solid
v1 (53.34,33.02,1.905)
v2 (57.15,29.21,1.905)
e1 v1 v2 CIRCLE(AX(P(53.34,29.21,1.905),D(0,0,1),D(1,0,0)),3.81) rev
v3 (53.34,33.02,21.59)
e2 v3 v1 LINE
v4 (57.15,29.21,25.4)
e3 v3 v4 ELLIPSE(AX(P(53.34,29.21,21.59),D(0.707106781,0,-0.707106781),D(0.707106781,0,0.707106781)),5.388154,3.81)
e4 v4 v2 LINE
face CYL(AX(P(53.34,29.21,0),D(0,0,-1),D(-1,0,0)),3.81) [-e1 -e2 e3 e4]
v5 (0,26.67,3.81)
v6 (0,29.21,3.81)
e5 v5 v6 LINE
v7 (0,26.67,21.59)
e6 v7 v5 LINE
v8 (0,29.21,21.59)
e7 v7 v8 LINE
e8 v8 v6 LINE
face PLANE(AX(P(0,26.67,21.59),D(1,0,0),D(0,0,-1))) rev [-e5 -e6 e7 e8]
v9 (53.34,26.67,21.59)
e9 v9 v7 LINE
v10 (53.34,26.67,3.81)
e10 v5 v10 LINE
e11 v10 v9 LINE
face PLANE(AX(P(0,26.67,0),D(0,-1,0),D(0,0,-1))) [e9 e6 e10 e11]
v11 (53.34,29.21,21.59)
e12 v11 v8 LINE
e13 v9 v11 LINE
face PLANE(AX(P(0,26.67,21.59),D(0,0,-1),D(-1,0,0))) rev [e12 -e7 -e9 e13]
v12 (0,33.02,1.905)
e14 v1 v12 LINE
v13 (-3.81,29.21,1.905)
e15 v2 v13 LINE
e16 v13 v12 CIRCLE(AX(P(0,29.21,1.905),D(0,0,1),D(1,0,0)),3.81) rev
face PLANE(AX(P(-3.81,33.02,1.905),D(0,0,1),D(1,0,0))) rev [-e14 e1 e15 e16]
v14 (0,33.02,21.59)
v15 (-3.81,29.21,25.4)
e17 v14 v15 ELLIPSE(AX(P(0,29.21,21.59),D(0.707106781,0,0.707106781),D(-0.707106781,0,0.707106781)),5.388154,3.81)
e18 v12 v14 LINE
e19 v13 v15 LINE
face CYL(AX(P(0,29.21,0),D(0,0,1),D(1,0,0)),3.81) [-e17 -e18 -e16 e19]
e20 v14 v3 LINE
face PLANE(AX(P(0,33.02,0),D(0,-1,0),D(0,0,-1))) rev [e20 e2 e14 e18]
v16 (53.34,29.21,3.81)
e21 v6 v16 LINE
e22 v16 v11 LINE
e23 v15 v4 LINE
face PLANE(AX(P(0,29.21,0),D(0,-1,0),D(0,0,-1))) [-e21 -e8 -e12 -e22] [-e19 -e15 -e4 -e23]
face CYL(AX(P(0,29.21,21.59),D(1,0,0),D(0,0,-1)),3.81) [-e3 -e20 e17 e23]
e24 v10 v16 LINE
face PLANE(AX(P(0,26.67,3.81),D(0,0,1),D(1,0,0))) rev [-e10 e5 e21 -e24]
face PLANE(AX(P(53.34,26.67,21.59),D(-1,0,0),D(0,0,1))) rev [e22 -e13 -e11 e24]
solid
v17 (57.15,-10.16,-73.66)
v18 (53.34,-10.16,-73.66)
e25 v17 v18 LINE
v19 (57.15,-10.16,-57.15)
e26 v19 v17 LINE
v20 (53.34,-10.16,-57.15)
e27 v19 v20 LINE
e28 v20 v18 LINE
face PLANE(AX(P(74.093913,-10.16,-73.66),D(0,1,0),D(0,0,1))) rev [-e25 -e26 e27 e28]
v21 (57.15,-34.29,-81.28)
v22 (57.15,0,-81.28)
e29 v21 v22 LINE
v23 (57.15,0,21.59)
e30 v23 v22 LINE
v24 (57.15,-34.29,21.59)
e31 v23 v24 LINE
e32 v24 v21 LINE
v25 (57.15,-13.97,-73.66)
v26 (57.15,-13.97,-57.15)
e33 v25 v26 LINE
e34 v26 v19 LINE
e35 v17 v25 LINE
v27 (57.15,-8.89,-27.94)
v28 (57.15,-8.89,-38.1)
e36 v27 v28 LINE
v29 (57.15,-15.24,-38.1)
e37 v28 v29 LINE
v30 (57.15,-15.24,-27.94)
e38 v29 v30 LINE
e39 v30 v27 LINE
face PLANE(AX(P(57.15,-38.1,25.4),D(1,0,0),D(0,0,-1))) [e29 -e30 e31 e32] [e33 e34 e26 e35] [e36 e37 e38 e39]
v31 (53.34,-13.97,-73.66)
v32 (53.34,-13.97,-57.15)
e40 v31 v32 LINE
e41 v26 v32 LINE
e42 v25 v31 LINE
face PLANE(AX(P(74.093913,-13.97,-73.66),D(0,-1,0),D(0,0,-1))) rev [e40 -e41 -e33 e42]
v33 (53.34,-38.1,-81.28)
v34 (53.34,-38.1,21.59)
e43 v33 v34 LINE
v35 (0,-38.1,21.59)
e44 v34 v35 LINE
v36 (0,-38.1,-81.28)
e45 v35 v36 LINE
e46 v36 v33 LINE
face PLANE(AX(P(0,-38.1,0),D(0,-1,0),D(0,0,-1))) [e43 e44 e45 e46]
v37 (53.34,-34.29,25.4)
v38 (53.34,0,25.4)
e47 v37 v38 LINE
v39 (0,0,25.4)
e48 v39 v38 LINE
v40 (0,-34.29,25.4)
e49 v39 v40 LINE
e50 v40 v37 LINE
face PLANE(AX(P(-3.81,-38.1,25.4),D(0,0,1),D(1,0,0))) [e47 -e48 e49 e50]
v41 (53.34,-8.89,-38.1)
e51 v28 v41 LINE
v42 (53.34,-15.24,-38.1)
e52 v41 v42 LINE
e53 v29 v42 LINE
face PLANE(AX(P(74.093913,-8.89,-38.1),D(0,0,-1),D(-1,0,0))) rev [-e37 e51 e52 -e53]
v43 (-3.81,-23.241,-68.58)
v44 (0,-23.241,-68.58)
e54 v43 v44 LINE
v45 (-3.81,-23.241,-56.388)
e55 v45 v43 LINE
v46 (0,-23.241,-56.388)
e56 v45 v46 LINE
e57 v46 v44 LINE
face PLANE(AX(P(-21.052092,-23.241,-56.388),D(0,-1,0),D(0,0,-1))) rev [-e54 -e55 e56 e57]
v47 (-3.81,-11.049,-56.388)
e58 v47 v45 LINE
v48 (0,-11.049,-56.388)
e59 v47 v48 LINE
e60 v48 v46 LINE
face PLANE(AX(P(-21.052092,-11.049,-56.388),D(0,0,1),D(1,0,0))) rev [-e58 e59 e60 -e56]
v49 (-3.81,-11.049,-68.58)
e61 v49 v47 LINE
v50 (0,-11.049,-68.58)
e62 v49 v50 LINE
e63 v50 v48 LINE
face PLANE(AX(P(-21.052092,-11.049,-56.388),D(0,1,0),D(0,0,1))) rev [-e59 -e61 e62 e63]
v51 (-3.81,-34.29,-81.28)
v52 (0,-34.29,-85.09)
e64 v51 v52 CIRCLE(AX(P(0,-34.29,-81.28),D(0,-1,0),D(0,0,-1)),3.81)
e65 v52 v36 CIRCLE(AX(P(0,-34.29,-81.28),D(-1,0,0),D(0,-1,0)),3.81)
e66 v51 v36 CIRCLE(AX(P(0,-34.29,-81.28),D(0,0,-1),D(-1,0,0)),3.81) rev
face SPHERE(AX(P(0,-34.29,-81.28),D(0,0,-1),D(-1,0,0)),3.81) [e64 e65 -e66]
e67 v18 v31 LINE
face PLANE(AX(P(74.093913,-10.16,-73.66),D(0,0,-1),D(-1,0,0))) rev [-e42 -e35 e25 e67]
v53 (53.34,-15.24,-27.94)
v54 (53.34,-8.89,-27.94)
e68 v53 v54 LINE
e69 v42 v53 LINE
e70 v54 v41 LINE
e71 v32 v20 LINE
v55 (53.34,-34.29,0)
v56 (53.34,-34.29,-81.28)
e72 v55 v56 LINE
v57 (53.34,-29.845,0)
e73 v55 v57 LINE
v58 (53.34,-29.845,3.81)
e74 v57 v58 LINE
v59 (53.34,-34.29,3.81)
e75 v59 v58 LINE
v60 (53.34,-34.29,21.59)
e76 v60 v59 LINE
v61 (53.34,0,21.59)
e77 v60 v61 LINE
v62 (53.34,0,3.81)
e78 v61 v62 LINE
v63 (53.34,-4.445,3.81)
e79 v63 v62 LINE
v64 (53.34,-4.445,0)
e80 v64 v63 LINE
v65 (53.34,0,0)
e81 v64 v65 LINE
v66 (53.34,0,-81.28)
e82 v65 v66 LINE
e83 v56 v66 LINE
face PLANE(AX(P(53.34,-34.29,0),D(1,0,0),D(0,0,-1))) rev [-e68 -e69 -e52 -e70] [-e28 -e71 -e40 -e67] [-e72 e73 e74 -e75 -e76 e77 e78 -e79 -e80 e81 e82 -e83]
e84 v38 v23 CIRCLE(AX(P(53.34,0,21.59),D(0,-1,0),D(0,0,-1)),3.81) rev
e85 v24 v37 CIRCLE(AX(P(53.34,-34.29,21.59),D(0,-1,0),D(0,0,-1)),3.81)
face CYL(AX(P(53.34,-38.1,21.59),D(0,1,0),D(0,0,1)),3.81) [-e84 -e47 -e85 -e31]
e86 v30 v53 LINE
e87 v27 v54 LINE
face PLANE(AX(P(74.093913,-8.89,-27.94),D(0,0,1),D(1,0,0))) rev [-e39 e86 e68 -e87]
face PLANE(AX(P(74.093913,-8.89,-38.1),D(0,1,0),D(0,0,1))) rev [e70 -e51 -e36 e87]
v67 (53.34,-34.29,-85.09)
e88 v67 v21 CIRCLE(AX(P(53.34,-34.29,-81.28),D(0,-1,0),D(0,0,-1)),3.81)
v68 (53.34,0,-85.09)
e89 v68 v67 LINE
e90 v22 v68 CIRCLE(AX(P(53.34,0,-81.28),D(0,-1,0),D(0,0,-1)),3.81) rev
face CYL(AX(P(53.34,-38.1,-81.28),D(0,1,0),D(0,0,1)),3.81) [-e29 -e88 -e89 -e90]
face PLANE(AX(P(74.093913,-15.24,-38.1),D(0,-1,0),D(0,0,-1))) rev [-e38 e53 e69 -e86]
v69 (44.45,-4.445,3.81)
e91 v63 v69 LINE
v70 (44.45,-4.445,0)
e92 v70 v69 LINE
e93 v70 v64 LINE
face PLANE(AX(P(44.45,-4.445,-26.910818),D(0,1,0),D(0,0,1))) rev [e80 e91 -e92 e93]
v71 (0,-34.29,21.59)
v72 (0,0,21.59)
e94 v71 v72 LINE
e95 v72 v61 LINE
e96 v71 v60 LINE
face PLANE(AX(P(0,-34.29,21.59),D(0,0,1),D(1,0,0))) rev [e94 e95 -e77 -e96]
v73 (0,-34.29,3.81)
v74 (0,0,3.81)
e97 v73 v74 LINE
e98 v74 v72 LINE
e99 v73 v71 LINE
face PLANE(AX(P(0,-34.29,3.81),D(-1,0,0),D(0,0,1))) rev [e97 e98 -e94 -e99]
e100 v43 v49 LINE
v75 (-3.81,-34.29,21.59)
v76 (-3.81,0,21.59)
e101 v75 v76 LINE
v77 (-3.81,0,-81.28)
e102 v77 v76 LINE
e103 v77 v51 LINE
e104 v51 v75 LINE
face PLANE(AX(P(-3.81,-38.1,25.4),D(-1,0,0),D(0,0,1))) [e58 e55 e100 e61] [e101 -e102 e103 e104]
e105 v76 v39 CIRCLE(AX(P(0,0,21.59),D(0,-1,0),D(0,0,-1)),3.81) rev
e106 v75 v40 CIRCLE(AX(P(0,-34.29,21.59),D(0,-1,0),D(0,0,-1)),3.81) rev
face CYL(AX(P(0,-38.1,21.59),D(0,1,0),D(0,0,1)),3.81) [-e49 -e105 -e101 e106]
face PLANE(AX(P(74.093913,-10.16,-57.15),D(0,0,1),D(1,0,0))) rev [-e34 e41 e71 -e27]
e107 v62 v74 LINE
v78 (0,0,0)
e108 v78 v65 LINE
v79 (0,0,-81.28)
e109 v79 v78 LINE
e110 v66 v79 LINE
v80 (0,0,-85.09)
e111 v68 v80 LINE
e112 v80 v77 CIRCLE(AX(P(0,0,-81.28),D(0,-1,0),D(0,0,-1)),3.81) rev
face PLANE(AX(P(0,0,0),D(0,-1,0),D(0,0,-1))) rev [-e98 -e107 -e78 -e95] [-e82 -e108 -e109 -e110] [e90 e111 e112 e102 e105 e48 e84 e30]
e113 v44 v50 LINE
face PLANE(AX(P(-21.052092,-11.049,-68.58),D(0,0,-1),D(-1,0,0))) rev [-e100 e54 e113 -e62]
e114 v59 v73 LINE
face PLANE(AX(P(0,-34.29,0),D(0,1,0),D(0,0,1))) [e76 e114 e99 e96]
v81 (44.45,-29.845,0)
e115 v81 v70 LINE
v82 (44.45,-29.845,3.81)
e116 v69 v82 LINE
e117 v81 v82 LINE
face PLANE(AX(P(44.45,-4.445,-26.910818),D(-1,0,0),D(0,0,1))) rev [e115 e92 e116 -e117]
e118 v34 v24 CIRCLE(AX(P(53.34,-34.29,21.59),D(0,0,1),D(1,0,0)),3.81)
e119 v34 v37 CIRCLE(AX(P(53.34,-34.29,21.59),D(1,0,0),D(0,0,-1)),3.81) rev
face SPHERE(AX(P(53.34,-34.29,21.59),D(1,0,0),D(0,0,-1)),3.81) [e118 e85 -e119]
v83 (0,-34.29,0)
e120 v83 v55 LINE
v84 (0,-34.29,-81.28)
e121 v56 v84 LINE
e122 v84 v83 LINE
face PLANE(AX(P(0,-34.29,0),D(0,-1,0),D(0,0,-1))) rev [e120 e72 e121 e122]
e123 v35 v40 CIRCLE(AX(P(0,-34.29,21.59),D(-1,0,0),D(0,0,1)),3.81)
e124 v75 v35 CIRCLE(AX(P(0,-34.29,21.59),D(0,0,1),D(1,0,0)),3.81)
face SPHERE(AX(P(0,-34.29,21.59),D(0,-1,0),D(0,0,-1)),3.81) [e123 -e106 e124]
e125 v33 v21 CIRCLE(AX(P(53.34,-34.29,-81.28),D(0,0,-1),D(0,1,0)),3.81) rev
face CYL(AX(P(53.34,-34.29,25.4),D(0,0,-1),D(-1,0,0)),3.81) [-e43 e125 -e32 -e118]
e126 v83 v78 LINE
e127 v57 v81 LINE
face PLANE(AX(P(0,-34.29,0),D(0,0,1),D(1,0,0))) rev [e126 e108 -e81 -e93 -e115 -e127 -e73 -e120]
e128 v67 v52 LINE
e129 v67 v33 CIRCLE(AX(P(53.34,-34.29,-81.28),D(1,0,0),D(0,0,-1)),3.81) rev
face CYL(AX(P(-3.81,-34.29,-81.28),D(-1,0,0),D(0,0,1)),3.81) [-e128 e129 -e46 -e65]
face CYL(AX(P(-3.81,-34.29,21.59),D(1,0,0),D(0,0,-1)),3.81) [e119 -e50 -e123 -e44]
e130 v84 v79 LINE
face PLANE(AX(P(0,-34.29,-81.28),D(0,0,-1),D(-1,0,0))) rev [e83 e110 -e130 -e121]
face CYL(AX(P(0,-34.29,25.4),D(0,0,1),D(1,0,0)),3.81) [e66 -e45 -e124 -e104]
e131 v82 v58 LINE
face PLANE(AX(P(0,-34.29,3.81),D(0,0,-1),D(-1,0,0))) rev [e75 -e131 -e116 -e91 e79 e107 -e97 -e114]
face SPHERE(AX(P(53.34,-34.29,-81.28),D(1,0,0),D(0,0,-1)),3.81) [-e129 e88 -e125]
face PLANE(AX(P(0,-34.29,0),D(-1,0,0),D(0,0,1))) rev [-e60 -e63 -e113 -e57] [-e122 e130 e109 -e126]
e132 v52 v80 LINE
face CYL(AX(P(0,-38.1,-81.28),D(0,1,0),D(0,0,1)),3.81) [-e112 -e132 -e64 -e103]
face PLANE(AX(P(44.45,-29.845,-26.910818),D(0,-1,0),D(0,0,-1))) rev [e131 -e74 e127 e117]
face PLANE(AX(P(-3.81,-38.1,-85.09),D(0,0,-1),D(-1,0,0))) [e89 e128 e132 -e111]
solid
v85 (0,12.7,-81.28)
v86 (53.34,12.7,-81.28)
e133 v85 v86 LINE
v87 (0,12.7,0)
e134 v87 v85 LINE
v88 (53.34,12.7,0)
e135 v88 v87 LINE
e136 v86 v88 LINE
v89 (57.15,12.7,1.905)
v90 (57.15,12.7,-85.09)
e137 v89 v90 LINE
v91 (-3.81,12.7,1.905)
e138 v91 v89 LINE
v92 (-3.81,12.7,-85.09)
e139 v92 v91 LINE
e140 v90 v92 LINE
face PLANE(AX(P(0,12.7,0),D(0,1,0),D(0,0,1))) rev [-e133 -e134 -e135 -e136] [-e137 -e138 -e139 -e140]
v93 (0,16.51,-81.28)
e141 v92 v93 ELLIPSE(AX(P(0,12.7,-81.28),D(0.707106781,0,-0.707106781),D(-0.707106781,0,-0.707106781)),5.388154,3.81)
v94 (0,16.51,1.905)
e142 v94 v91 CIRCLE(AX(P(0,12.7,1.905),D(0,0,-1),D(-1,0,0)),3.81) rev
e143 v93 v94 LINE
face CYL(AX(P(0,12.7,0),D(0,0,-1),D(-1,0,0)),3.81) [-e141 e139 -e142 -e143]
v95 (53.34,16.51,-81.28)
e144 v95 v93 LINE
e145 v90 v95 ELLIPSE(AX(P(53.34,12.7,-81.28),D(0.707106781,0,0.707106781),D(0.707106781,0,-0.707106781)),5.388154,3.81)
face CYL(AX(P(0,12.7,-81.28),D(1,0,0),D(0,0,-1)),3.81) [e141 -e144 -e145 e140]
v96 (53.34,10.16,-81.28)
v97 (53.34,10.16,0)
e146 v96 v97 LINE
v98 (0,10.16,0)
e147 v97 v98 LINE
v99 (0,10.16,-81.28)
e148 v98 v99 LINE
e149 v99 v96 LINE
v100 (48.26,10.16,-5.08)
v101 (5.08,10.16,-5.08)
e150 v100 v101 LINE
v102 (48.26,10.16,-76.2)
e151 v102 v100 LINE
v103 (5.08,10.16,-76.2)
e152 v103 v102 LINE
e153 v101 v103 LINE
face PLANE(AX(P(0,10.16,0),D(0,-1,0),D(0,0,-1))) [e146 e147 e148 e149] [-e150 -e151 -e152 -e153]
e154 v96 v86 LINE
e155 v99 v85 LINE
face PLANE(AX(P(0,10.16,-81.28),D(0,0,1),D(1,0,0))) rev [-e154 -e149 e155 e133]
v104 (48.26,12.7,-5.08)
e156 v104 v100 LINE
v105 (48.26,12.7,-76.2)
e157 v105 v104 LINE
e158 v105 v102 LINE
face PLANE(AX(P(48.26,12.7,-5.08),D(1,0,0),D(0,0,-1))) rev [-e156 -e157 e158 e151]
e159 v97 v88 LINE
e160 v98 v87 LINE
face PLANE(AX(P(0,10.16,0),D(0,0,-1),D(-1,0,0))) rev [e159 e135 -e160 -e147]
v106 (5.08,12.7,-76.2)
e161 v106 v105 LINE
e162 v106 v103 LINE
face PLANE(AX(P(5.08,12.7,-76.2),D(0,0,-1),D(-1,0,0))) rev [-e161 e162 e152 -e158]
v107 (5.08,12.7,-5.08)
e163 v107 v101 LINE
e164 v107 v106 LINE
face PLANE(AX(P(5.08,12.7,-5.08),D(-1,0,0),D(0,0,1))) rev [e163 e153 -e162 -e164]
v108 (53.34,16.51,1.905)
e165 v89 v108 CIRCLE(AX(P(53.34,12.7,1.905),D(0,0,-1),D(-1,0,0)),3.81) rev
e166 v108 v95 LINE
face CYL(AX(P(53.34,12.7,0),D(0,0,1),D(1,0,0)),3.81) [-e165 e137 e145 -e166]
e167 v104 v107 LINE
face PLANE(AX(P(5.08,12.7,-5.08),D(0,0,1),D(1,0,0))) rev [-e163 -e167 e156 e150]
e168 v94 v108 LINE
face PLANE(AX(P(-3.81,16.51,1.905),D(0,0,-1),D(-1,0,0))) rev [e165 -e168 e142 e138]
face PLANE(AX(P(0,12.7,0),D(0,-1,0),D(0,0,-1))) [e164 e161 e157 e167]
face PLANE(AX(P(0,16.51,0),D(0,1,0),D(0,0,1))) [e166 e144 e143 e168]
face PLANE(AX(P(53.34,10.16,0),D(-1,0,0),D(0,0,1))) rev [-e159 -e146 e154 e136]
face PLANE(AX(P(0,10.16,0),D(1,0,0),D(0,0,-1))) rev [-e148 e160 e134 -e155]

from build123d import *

# Parameters (mm, degrees)
SKETCH3_W           = 60.96
SKETCH3_H           = 110.49
BOSS_EXTRUDE2_DEPTH = 38.1
SKETCH1_W           = 53.34
SKETCH1_H           = 81.28
SKETCH1_H_2         = 17.78
CUT_EXTRUDE1_DEPTH  = 34.29
SKETCH4_W           = 8.89
SKETCH4_H           = 25.4
CUT_EXTRUDE2_DEPTH  = 3.81
SKETCH5_W           = 10.16
SKETCH5_H           = 6.35
SKETCH5_W_2         = 16.51
SKETCH5_H_2         = 3.81
CUT_EXTRUDE3_DEPTH  = 3.81
SKETCH6_W           = 12.192
SKETCH6_H           = 12.192
CUT_EXTRUDE4_DEPTH  = 3.81
SKETCH8_W           = 60.96
SKETCH8_H           = 86.995
BOSS_EXTRUDE3_DEPTH = 3.81
SKETCH9_W           = 60.96
SKETCH9_H           = 23.495
BOSS_EXTRUDE4_DEPTH = 3.81
SKETCH10_W          = 53.34
SKETCH10_H          = 81.28
BOSS_EXTRUDE5_DEPTH = 2.54
SKETCH11_W          = 53.34
SKETCH11_H          = 17.78
BOSS_EXTRUDE6_DEPTH = 2.54
FILLET1_R           = 3.81
FILLET2_R           = 3.81
FILLET3_R           = 3.81
SKETCH12_W          = 43.18
SKETCH12_H          = 71.12
CUT_EXTRUDE5_DEPTH  = 2.54


with BuildPart() as part:
    # Sketch3 → Boss-Extrude2 (new body)
    with BuildSketch(Plane(origin=(0, 0, 0), x_dir=(1, 0, 0), z_dir=(0, 1, 0))):
        with Locations((26.67, 29.845)):
            Rectangle(SKETCH3_W, SKETCH3_H)
    extrude(amount=-BOSS_EXTRUDE2_DEPTH)

    # Sketch1 → Cut-Extrude1 (cut)
    with BuildSketch(Plane(origin=(0, 0, 0), x_dir=(1, 0, 0), z_dir=(0, 1, 0))):
        with Locations((26.67, 40.64)):
            Rectangle(SKETCH1_W, SKETCH1_H)
        with Locations((26.67, -12.7)):
            Rectangle(SKETCH1_W, SKETCH1_H_2)
    extrude(amount=-CUT_EXTRUDE1_DEPTH, mode=Mode.SUBTRACT)

    # Sketch4 → Cut-Extrude2 (cut)
    with BuildSketch(Plane.XY.offset(3.81)):
        with Locations((48.895, -17.145)):
            Rectangle(SKETCH4_W, SKETCH4_H)
    extrude(amount=-CUT_EXTRUDE2_DEPTH, mode=Mode.SUBTRACT)

    # Sketch5 → Cut-Extrude3 (cut)
    with BuildSketch(Plane.ZY.offset(-53.34)):
        with Locations((-33.02, -12.065)):
            Rectangle(SKETCH5_W, SKETCH5_H)
        with Locations((-65.405, -12.065)):
            Rectangle(SKETCH5_W_2, SKETCH5_H_2)
    extrude(amount=-CUT_EXTRUDE3_DEPTH, mode=Mode.SUBTRACT)

    # Sketch6 → Cut-Extrude4 (cut)
    with BuildSketch(Plane(origin=(0, 0, 0), x_dir=(0, 0, -1), z_dir=(1, 0, 0))):
        with Locations((62.484, -17.145)):
            Rectangle(SKETCH6_W, SKETCH6_H)
    extrude(amount=-CUT_EXTRUDE4_DEPTH, mode=Mode.SUBTRACT)

    # Fillet1
    fillet1_edges = [part.edges().sort_by_distance(p)[0] for p in [
        (57.15, -38.1, -29.845),
        (26.67, -38.1, -85.09),
        (-3.81, -38.1, -29.845),
        (-3.81, -19.05, -85.09),
        (57.15, -19.05, -85.09),
        (57.15, -19.05, 25.4),
        (-3.81, -19.05, 25.4),
        (26.67, -38.1, 25.4),
    ]]
    fillet(fillet1_edges, radius=FILLET1_R)


with BuildPart() as body_2:
    # Sketch8 → Boss-Extrude3 (new body)
    with BuildSketch(Plane(origin=(0, 12.7, 0), x_dir=(1, 0, 0), z_dir=(0, 1, 0))):
        with Locations((26.67, 41.5925)):
            Rectangle(SKETCH8_W, SKETCH8_H)
    extrude(amount=BOSS_EXTRUDE3_DEPTH)

    # Sketch10 → Boss-Extrude5 (add)
    with BuildSketch(Plane.XZ.offset(-12.7)):
        with Locations((26.67, -40.64)):
            Rectangle(SKETCH10_W, SKETCH10_H)
    extrude(amount=BOSS_EXTRUDE5_DEPTH)

    # Fillet2
    fillet2_edges = [body_2.edges().sort_by_distance(p)[0] for p in [
        (57.15, 16.51, -41.5925),
        (26.67, 16.51, -85.09),
        (-3.81, 16.51, -41.5925),
    ]]
    fillet(fillet2_edges, radius=FILLET2_R - 0.0001)  # a hair under: the kernel refuses the full size

    # Sketch12 → Cut-Extrude5 (cut)
    with BuildSketch(Plane.XZ.offset(-10.16)):
        with Locations((26.67, -40.64)):
            Rectangle(SKETCH12_W, SKETCH12_H)
    extrude(amount=-CUT_EXTRUDE5_DEPTH, mode=Mode.SUBTRACT)


with BuildPart() as body_3:
    # Sketch9 → Boss-Extrude4 (new body)
    with BuildSketch(Plane(origin=(0, 29.21, 0), x_dir=(1, 0, 0), z_dir=(0, 1, 0))):
        with Locations((26.67, -13.6525)):
            Rectangle(SKETCH9_W, SKETCH9_H)
    extrude(amount=BOSS_EXTRUDE4_DEPTH)

    # Sketch11 → Boss-Extrude6 (add)
    with BuildSketch(Plane.XZ.offset(-29.21)):
        with Locations((26.67, 12.7)):
            Rectangle(SKETCH11_W, SKETCH11_H)
    extrude(amount=BOSS_EXTRUDE6_DEPTH)

    # Fillet3
    fillet3_edges = [body_3.edges().sort_by_distance(p)[0] for p in [
        (57.15, 33.02, 13.6525),
        (26.67, 33.02, 25.4),
        (-3.81, 33.02, 13.6525),
    ]]
    fillet(fillet3_edges, radius=FILLET3_R - 0.0001)  # a hair under: the kernel refuses the full size


solid = Compound([part.part, body_2.part, body_3.part])
